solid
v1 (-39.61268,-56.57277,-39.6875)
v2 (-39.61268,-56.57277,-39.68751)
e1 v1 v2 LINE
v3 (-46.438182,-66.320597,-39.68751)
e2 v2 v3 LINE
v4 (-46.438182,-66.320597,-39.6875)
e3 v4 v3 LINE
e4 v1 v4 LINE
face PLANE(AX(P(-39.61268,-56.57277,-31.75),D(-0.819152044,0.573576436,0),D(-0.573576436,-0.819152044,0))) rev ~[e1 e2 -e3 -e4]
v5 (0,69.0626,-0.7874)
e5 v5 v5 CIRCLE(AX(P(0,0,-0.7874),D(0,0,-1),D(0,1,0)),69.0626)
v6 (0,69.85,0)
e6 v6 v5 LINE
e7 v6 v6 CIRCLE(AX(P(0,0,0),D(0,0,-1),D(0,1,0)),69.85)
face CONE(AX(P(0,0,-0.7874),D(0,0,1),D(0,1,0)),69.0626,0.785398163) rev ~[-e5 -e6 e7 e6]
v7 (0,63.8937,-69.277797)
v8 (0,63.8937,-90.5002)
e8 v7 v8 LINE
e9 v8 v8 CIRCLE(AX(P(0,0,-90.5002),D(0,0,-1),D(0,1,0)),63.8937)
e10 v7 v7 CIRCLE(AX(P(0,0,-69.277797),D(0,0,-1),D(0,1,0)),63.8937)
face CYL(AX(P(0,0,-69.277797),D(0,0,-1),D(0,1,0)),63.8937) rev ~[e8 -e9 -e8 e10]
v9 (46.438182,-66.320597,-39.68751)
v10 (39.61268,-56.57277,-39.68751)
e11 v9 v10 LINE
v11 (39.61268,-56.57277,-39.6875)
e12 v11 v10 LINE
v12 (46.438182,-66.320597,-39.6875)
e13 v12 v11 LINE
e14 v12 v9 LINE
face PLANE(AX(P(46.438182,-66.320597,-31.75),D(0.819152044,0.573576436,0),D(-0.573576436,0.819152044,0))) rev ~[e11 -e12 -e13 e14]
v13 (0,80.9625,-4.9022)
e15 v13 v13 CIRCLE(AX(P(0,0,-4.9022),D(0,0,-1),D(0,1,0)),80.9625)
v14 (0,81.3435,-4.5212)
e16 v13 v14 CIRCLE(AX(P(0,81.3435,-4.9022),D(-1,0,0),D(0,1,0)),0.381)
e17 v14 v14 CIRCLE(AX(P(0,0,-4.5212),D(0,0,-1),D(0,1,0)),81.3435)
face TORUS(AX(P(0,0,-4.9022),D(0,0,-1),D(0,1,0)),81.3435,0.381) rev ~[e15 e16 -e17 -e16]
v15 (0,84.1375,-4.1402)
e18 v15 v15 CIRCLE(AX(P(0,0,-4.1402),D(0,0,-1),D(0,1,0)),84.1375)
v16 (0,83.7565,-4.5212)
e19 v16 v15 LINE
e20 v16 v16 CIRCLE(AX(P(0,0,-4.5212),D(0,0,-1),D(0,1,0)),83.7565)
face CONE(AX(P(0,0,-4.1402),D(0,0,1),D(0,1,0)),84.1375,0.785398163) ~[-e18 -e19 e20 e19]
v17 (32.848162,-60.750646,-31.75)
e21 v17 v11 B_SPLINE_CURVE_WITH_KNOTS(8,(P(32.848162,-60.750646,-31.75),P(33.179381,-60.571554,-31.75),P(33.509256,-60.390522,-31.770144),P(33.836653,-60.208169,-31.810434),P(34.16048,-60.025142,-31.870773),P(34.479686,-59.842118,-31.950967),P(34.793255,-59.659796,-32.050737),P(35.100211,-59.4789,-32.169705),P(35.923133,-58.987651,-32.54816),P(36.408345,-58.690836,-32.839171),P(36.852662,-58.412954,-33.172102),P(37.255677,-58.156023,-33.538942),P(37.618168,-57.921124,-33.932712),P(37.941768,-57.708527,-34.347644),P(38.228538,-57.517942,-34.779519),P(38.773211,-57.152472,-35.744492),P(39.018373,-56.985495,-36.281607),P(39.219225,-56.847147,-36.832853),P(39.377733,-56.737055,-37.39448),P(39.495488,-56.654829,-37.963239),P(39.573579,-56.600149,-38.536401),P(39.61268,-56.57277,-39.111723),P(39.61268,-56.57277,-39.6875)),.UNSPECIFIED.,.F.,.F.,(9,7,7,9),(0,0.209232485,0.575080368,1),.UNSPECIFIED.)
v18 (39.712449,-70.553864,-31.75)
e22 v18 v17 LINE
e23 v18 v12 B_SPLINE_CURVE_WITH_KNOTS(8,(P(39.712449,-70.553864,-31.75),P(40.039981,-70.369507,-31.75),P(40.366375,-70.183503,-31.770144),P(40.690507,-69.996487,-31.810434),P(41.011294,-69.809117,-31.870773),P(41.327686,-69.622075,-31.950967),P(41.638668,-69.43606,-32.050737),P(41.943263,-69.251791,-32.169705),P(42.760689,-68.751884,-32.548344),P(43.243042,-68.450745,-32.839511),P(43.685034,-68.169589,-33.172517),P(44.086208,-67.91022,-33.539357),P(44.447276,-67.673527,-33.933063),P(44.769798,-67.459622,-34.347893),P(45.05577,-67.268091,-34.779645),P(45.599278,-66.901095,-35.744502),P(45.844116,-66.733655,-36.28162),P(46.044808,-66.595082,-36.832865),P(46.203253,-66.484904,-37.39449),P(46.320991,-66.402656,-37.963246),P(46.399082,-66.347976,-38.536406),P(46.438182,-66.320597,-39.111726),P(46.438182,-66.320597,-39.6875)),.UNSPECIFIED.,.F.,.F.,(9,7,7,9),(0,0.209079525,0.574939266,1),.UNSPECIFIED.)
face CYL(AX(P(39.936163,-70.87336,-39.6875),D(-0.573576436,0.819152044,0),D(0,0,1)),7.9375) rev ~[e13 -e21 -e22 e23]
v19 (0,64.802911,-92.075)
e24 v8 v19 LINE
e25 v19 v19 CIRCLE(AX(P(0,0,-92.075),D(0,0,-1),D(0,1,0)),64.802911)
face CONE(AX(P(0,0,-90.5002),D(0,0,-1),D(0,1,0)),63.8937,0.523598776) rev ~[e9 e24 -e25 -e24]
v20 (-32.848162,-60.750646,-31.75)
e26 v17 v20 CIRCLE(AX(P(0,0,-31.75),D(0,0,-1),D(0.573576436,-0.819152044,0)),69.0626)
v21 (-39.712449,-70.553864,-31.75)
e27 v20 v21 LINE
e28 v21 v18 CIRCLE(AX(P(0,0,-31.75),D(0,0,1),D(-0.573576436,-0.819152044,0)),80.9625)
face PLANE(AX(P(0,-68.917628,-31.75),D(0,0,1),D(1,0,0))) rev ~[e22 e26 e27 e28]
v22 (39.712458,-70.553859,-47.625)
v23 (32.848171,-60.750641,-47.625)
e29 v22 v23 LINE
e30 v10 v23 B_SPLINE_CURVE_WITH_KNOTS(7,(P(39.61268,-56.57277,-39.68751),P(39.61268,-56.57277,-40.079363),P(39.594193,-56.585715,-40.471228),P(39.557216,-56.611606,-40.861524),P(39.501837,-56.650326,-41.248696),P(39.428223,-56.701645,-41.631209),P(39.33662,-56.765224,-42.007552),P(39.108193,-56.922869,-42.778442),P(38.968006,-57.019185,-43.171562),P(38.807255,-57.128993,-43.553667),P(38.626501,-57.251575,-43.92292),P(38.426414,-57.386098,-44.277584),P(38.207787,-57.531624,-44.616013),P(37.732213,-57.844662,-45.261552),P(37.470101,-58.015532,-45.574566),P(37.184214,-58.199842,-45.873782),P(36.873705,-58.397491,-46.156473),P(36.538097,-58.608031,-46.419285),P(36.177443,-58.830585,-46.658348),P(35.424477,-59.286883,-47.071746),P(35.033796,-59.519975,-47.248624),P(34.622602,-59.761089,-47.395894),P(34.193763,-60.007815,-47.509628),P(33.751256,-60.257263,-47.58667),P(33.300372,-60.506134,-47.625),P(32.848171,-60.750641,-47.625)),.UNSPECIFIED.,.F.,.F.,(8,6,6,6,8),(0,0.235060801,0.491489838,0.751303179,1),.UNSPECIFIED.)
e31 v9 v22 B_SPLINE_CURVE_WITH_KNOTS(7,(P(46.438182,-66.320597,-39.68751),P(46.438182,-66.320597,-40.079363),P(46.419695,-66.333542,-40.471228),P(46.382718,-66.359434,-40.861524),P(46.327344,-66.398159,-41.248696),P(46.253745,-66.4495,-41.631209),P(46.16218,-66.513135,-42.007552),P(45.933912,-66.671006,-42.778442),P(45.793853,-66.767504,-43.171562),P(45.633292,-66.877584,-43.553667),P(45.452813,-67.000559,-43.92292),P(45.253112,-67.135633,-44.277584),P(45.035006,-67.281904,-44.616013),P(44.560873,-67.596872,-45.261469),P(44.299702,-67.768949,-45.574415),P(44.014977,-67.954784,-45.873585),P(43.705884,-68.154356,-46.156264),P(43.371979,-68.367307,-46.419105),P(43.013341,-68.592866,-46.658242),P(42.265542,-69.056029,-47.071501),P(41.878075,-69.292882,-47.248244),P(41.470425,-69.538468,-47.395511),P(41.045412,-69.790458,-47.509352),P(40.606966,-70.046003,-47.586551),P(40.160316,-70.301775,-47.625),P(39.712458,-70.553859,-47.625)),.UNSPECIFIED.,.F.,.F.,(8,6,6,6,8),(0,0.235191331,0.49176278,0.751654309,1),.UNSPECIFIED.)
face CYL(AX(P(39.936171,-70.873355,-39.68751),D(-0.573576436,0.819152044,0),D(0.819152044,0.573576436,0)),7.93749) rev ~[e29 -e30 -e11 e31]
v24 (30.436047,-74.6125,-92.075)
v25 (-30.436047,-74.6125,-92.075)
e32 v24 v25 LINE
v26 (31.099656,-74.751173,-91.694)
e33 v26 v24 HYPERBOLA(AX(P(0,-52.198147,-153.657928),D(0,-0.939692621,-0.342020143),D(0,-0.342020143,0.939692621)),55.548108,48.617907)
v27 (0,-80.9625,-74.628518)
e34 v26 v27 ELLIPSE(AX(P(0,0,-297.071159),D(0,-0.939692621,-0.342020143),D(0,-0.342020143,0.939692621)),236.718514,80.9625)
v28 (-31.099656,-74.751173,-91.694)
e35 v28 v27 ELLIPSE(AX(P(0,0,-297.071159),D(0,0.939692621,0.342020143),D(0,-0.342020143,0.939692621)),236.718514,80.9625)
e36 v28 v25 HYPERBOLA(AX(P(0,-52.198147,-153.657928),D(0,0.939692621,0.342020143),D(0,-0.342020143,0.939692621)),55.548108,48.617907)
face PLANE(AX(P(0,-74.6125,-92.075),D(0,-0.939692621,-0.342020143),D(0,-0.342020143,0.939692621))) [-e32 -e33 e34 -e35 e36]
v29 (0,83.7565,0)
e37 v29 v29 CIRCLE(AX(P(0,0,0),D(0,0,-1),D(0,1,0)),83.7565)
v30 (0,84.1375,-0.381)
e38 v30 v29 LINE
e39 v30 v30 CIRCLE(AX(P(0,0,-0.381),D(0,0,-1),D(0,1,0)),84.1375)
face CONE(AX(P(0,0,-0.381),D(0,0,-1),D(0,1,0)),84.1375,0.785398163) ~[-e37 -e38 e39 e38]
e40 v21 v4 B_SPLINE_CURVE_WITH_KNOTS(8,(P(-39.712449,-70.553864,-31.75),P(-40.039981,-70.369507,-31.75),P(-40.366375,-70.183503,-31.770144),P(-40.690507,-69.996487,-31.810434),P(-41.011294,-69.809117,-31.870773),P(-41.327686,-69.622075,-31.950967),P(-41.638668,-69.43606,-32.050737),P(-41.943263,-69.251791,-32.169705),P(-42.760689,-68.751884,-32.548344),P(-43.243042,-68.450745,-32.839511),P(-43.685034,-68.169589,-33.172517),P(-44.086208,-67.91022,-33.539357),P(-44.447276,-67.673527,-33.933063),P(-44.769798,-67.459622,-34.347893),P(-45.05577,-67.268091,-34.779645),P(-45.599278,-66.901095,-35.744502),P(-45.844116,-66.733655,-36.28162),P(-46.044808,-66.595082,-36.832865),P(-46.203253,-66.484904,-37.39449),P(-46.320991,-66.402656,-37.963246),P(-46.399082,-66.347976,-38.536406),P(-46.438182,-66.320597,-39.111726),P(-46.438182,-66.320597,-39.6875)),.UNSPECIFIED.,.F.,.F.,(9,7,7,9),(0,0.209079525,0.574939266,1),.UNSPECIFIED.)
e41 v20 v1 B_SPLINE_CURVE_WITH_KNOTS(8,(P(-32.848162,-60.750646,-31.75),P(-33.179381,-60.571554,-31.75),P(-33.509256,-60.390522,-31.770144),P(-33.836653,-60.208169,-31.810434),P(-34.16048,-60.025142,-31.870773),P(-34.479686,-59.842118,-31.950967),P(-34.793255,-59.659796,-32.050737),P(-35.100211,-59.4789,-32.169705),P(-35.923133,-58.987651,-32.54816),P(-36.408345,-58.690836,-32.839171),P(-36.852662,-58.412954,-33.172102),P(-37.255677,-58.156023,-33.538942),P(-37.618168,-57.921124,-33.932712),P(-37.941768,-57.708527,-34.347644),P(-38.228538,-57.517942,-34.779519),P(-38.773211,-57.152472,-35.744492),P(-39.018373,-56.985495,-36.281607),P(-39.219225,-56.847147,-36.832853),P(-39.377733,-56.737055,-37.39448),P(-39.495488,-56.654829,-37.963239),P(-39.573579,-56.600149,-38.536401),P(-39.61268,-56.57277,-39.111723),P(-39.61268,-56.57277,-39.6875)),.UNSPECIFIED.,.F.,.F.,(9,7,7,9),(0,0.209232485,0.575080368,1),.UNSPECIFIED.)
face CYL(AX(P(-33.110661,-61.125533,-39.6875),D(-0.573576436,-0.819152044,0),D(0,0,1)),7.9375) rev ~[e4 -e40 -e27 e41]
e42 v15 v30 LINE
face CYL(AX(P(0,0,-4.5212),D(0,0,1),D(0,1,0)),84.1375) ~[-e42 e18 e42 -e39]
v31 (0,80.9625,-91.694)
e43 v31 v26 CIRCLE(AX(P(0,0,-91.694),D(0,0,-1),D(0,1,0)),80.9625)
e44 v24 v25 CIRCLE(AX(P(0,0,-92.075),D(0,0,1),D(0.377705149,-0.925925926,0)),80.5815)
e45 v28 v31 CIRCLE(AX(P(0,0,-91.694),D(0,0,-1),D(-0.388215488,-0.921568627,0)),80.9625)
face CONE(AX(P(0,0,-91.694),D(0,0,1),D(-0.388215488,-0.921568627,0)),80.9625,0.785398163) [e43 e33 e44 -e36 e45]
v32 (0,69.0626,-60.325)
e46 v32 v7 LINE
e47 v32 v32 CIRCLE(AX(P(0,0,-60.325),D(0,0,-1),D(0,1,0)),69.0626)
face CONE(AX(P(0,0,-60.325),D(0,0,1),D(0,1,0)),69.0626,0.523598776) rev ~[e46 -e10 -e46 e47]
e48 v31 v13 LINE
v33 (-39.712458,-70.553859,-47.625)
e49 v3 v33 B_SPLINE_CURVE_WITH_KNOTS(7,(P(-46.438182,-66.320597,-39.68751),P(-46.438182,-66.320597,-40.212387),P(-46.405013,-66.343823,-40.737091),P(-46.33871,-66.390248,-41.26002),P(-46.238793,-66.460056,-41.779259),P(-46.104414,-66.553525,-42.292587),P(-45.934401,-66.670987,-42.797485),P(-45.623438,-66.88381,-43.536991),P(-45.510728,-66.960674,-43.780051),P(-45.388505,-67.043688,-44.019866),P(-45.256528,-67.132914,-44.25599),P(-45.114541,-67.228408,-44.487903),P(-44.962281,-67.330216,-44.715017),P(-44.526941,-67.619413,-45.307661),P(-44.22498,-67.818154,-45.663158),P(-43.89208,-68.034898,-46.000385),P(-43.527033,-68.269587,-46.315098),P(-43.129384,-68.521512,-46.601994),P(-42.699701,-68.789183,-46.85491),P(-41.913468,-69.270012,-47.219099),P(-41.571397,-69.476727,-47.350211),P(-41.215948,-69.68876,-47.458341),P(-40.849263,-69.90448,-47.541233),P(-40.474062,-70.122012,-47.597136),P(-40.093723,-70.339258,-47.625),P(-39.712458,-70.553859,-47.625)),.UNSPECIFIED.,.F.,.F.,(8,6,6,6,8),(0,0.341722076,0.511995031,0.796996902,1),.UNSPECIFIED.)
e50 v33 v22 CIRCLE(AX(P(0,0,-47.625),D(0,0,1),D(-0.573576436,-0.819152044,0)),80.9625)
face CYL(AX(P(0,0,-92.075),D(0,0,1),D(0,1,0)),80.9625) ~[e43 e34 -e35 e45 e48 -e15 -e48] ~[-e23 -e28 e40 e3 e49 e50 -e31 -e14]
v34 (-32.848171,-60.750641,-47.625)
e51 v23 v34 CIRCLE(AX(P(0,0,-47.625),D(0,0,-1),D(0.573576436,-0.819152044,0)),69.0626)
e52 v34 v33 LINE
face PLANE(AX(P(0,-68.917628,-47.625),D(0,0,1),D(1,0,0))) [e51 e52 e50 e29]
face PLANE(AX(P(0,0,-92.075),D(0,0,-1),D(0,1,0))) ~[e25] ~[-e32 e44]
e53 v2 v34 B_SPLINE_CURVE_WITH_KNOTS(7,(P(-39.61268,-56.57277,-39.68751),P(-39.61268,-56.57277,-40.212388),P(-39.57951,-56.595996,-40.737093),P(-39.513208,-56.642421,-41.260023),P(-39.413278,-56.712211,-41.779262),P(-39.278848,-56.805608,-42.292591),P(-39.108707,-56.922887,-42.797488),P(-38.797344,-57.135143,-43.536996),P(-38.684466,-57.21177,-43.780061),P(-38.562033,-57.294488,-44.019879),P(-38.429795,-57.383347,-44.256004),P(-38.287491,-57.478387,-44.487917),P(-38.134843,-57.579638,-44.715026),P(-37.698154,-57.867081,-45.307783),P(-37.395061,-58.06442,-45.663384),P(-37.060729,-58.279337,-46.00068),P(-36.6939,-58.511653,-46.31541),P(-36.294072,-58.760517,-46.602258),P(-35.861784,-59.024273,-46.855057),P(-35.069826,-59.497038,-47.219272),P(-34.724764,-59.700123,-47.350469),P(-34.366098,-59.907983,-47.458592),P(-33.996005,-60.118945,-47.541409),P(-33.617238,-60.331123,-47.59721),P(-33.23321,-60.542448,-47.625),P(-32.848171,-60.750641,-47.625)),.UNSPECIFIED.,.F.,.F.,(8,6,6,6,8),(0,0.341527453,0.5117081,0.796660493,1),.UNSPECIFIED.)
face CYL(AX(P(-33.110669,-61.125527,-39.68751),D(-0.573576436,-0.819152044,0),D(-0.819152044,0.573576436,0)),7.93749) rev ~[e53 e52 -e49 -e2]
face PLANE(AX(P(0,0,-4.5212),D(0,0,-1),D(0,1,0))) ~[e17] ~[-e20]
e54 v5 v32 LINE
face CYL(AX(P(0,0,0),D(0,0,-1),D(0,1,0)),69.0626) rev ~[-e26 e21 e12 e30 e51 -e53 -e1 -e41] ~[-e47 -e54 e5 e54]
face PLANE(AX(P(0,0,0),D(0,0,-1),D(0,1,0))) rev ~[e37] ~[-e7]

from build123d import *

# Parameters (mm, degrees)
F2_R          = 0.381
F3_SIZE       = 0.381
F4_SIZE       = 0.7874
F5_SIZE2      = 0.9092112039
F5_SIZE       = 1.5748
F7_DEPTH      = 84.1385
F7_DEPTH_BACK = 84.1385
F8_SIZE       = 0.381
F11_DEPTH     = 15.875
F12_R         = 7.9375
F13_R         = 7.93749


# Not quite as in the source:
# - a fillet or chamfer is up to 0.001 mm smaller than in the source, because OpenCascade refuses the exact size


with BuildPart() as f1:
    # F0 (on Right) → F1 (revolve)
    with BuildSketch(Plane.YZ):
        Polygon((84.1375, -4.5212), (84.1375, 0), (69.0626, 0), (69.0626, -60.325), (63.8937, -69.2777974192), (63.8937, -92.075), (80.9625, -92.075), (80.9625, -4.5212), align=None)
    revolve(axis=Axis((0, 0, -46.0375), (0, 0, -1)))

    # F2
    f2_edges = [f1.edges().sort_by_distance(p)[0] for p in [
        (0, -80.9625, -4.5212),
    ]]
    fillet(f2_edges, radius=F2_R)

    # F3
    f3_edges = [f1.edges().sort_by_distance(p)[0] for p in [
        (0, -84.1375, -4.5212),
        (0, -84.1375, 0),
        (0, 84.1375, -2.2606),
    ]]
    chamfer(f3_edges, length=F3_SIZE)

    # F4
    f4_edges = [f1.edges().sort_by_distance(p)[0] for p in [
        (0, -69.0626, 0),
    ]]
    chamfer(f4_edges, length=F4_SIZE)

    # F5
    f5_edges = [f1.edges().sort_by_distance(p)[0] for p in [
        (0, -63.8937, -92.075),
    ]]
    chamfer(f5_edges, length=F5_SIZE, length2=F5_SIZE2)

    # F6 (on Right) → F7 (cut, two sides)
    with BuildSketch(Plane.YZ) as f7_sk:
        Polygon((-80.9625, -74.6285183865), (-80.9625, -92.075), (-74.6125, -92.075), align=None)
    extrude(amount=F7_DEPTH, mode=Mode.SUBTRACT)
    extrude(f7_sk.sketch, amount=-F7_DEPTH_BACK, mode=Mode.SUBTRACT)

    # F8
    f8_edges = [f1.edges().sort_by_distance(p)[0] for p in [
        (79.359123, 16.032964, -92.075),
    ]]
    chamfer(f8_edges, length=F8_SIZE)

    # F10 (on offset) → F11 (cut)
    with BuildSketch(Plane.XY.offset(-31.75)):
        with BuildLine():
            Line((-39.6126799931, -56.5727699739), (-46.4381822281, -66.3205973857))
            ThreePointArc((-46.4381822281, -66.3205973857), (0, -80.9625), (46.4381822281, -66.3205973857))
            Line((46.4381822281, -66.3205973857), (39.6126799931, -56.5727699739))
            ThreePointArc((39.6126799931, -56.5727699739), (0, -69.0626), (-39.6126799931, -56.5727699739))
        make_face()
    extrude(amount=-F11_DEPTH, mode=Mode.SUBTRACT)

    # F12
    f12_edges = [f1.edges().sort_by_distance(p)[0] for p in [
        (-43.025431, -61.446684, -31.75),
        (43.025431, -61.446684, -31.75),
    ]]
    fillet(f12_edges, radius=F12_R)

    # F13 (radius 7.9375 in the source; OpenCascade refuses exactly that, so slightly less here)
    f13_edges = [f1.edges().sort_by_distance(p)[0] for p in [
        (-43.025431, -61.446684, -47.625),
        (43.025431, -61.446684, -47.625),
    ]]
    fillet(f13_edges, radius=F13_R)


solid = f1.part
